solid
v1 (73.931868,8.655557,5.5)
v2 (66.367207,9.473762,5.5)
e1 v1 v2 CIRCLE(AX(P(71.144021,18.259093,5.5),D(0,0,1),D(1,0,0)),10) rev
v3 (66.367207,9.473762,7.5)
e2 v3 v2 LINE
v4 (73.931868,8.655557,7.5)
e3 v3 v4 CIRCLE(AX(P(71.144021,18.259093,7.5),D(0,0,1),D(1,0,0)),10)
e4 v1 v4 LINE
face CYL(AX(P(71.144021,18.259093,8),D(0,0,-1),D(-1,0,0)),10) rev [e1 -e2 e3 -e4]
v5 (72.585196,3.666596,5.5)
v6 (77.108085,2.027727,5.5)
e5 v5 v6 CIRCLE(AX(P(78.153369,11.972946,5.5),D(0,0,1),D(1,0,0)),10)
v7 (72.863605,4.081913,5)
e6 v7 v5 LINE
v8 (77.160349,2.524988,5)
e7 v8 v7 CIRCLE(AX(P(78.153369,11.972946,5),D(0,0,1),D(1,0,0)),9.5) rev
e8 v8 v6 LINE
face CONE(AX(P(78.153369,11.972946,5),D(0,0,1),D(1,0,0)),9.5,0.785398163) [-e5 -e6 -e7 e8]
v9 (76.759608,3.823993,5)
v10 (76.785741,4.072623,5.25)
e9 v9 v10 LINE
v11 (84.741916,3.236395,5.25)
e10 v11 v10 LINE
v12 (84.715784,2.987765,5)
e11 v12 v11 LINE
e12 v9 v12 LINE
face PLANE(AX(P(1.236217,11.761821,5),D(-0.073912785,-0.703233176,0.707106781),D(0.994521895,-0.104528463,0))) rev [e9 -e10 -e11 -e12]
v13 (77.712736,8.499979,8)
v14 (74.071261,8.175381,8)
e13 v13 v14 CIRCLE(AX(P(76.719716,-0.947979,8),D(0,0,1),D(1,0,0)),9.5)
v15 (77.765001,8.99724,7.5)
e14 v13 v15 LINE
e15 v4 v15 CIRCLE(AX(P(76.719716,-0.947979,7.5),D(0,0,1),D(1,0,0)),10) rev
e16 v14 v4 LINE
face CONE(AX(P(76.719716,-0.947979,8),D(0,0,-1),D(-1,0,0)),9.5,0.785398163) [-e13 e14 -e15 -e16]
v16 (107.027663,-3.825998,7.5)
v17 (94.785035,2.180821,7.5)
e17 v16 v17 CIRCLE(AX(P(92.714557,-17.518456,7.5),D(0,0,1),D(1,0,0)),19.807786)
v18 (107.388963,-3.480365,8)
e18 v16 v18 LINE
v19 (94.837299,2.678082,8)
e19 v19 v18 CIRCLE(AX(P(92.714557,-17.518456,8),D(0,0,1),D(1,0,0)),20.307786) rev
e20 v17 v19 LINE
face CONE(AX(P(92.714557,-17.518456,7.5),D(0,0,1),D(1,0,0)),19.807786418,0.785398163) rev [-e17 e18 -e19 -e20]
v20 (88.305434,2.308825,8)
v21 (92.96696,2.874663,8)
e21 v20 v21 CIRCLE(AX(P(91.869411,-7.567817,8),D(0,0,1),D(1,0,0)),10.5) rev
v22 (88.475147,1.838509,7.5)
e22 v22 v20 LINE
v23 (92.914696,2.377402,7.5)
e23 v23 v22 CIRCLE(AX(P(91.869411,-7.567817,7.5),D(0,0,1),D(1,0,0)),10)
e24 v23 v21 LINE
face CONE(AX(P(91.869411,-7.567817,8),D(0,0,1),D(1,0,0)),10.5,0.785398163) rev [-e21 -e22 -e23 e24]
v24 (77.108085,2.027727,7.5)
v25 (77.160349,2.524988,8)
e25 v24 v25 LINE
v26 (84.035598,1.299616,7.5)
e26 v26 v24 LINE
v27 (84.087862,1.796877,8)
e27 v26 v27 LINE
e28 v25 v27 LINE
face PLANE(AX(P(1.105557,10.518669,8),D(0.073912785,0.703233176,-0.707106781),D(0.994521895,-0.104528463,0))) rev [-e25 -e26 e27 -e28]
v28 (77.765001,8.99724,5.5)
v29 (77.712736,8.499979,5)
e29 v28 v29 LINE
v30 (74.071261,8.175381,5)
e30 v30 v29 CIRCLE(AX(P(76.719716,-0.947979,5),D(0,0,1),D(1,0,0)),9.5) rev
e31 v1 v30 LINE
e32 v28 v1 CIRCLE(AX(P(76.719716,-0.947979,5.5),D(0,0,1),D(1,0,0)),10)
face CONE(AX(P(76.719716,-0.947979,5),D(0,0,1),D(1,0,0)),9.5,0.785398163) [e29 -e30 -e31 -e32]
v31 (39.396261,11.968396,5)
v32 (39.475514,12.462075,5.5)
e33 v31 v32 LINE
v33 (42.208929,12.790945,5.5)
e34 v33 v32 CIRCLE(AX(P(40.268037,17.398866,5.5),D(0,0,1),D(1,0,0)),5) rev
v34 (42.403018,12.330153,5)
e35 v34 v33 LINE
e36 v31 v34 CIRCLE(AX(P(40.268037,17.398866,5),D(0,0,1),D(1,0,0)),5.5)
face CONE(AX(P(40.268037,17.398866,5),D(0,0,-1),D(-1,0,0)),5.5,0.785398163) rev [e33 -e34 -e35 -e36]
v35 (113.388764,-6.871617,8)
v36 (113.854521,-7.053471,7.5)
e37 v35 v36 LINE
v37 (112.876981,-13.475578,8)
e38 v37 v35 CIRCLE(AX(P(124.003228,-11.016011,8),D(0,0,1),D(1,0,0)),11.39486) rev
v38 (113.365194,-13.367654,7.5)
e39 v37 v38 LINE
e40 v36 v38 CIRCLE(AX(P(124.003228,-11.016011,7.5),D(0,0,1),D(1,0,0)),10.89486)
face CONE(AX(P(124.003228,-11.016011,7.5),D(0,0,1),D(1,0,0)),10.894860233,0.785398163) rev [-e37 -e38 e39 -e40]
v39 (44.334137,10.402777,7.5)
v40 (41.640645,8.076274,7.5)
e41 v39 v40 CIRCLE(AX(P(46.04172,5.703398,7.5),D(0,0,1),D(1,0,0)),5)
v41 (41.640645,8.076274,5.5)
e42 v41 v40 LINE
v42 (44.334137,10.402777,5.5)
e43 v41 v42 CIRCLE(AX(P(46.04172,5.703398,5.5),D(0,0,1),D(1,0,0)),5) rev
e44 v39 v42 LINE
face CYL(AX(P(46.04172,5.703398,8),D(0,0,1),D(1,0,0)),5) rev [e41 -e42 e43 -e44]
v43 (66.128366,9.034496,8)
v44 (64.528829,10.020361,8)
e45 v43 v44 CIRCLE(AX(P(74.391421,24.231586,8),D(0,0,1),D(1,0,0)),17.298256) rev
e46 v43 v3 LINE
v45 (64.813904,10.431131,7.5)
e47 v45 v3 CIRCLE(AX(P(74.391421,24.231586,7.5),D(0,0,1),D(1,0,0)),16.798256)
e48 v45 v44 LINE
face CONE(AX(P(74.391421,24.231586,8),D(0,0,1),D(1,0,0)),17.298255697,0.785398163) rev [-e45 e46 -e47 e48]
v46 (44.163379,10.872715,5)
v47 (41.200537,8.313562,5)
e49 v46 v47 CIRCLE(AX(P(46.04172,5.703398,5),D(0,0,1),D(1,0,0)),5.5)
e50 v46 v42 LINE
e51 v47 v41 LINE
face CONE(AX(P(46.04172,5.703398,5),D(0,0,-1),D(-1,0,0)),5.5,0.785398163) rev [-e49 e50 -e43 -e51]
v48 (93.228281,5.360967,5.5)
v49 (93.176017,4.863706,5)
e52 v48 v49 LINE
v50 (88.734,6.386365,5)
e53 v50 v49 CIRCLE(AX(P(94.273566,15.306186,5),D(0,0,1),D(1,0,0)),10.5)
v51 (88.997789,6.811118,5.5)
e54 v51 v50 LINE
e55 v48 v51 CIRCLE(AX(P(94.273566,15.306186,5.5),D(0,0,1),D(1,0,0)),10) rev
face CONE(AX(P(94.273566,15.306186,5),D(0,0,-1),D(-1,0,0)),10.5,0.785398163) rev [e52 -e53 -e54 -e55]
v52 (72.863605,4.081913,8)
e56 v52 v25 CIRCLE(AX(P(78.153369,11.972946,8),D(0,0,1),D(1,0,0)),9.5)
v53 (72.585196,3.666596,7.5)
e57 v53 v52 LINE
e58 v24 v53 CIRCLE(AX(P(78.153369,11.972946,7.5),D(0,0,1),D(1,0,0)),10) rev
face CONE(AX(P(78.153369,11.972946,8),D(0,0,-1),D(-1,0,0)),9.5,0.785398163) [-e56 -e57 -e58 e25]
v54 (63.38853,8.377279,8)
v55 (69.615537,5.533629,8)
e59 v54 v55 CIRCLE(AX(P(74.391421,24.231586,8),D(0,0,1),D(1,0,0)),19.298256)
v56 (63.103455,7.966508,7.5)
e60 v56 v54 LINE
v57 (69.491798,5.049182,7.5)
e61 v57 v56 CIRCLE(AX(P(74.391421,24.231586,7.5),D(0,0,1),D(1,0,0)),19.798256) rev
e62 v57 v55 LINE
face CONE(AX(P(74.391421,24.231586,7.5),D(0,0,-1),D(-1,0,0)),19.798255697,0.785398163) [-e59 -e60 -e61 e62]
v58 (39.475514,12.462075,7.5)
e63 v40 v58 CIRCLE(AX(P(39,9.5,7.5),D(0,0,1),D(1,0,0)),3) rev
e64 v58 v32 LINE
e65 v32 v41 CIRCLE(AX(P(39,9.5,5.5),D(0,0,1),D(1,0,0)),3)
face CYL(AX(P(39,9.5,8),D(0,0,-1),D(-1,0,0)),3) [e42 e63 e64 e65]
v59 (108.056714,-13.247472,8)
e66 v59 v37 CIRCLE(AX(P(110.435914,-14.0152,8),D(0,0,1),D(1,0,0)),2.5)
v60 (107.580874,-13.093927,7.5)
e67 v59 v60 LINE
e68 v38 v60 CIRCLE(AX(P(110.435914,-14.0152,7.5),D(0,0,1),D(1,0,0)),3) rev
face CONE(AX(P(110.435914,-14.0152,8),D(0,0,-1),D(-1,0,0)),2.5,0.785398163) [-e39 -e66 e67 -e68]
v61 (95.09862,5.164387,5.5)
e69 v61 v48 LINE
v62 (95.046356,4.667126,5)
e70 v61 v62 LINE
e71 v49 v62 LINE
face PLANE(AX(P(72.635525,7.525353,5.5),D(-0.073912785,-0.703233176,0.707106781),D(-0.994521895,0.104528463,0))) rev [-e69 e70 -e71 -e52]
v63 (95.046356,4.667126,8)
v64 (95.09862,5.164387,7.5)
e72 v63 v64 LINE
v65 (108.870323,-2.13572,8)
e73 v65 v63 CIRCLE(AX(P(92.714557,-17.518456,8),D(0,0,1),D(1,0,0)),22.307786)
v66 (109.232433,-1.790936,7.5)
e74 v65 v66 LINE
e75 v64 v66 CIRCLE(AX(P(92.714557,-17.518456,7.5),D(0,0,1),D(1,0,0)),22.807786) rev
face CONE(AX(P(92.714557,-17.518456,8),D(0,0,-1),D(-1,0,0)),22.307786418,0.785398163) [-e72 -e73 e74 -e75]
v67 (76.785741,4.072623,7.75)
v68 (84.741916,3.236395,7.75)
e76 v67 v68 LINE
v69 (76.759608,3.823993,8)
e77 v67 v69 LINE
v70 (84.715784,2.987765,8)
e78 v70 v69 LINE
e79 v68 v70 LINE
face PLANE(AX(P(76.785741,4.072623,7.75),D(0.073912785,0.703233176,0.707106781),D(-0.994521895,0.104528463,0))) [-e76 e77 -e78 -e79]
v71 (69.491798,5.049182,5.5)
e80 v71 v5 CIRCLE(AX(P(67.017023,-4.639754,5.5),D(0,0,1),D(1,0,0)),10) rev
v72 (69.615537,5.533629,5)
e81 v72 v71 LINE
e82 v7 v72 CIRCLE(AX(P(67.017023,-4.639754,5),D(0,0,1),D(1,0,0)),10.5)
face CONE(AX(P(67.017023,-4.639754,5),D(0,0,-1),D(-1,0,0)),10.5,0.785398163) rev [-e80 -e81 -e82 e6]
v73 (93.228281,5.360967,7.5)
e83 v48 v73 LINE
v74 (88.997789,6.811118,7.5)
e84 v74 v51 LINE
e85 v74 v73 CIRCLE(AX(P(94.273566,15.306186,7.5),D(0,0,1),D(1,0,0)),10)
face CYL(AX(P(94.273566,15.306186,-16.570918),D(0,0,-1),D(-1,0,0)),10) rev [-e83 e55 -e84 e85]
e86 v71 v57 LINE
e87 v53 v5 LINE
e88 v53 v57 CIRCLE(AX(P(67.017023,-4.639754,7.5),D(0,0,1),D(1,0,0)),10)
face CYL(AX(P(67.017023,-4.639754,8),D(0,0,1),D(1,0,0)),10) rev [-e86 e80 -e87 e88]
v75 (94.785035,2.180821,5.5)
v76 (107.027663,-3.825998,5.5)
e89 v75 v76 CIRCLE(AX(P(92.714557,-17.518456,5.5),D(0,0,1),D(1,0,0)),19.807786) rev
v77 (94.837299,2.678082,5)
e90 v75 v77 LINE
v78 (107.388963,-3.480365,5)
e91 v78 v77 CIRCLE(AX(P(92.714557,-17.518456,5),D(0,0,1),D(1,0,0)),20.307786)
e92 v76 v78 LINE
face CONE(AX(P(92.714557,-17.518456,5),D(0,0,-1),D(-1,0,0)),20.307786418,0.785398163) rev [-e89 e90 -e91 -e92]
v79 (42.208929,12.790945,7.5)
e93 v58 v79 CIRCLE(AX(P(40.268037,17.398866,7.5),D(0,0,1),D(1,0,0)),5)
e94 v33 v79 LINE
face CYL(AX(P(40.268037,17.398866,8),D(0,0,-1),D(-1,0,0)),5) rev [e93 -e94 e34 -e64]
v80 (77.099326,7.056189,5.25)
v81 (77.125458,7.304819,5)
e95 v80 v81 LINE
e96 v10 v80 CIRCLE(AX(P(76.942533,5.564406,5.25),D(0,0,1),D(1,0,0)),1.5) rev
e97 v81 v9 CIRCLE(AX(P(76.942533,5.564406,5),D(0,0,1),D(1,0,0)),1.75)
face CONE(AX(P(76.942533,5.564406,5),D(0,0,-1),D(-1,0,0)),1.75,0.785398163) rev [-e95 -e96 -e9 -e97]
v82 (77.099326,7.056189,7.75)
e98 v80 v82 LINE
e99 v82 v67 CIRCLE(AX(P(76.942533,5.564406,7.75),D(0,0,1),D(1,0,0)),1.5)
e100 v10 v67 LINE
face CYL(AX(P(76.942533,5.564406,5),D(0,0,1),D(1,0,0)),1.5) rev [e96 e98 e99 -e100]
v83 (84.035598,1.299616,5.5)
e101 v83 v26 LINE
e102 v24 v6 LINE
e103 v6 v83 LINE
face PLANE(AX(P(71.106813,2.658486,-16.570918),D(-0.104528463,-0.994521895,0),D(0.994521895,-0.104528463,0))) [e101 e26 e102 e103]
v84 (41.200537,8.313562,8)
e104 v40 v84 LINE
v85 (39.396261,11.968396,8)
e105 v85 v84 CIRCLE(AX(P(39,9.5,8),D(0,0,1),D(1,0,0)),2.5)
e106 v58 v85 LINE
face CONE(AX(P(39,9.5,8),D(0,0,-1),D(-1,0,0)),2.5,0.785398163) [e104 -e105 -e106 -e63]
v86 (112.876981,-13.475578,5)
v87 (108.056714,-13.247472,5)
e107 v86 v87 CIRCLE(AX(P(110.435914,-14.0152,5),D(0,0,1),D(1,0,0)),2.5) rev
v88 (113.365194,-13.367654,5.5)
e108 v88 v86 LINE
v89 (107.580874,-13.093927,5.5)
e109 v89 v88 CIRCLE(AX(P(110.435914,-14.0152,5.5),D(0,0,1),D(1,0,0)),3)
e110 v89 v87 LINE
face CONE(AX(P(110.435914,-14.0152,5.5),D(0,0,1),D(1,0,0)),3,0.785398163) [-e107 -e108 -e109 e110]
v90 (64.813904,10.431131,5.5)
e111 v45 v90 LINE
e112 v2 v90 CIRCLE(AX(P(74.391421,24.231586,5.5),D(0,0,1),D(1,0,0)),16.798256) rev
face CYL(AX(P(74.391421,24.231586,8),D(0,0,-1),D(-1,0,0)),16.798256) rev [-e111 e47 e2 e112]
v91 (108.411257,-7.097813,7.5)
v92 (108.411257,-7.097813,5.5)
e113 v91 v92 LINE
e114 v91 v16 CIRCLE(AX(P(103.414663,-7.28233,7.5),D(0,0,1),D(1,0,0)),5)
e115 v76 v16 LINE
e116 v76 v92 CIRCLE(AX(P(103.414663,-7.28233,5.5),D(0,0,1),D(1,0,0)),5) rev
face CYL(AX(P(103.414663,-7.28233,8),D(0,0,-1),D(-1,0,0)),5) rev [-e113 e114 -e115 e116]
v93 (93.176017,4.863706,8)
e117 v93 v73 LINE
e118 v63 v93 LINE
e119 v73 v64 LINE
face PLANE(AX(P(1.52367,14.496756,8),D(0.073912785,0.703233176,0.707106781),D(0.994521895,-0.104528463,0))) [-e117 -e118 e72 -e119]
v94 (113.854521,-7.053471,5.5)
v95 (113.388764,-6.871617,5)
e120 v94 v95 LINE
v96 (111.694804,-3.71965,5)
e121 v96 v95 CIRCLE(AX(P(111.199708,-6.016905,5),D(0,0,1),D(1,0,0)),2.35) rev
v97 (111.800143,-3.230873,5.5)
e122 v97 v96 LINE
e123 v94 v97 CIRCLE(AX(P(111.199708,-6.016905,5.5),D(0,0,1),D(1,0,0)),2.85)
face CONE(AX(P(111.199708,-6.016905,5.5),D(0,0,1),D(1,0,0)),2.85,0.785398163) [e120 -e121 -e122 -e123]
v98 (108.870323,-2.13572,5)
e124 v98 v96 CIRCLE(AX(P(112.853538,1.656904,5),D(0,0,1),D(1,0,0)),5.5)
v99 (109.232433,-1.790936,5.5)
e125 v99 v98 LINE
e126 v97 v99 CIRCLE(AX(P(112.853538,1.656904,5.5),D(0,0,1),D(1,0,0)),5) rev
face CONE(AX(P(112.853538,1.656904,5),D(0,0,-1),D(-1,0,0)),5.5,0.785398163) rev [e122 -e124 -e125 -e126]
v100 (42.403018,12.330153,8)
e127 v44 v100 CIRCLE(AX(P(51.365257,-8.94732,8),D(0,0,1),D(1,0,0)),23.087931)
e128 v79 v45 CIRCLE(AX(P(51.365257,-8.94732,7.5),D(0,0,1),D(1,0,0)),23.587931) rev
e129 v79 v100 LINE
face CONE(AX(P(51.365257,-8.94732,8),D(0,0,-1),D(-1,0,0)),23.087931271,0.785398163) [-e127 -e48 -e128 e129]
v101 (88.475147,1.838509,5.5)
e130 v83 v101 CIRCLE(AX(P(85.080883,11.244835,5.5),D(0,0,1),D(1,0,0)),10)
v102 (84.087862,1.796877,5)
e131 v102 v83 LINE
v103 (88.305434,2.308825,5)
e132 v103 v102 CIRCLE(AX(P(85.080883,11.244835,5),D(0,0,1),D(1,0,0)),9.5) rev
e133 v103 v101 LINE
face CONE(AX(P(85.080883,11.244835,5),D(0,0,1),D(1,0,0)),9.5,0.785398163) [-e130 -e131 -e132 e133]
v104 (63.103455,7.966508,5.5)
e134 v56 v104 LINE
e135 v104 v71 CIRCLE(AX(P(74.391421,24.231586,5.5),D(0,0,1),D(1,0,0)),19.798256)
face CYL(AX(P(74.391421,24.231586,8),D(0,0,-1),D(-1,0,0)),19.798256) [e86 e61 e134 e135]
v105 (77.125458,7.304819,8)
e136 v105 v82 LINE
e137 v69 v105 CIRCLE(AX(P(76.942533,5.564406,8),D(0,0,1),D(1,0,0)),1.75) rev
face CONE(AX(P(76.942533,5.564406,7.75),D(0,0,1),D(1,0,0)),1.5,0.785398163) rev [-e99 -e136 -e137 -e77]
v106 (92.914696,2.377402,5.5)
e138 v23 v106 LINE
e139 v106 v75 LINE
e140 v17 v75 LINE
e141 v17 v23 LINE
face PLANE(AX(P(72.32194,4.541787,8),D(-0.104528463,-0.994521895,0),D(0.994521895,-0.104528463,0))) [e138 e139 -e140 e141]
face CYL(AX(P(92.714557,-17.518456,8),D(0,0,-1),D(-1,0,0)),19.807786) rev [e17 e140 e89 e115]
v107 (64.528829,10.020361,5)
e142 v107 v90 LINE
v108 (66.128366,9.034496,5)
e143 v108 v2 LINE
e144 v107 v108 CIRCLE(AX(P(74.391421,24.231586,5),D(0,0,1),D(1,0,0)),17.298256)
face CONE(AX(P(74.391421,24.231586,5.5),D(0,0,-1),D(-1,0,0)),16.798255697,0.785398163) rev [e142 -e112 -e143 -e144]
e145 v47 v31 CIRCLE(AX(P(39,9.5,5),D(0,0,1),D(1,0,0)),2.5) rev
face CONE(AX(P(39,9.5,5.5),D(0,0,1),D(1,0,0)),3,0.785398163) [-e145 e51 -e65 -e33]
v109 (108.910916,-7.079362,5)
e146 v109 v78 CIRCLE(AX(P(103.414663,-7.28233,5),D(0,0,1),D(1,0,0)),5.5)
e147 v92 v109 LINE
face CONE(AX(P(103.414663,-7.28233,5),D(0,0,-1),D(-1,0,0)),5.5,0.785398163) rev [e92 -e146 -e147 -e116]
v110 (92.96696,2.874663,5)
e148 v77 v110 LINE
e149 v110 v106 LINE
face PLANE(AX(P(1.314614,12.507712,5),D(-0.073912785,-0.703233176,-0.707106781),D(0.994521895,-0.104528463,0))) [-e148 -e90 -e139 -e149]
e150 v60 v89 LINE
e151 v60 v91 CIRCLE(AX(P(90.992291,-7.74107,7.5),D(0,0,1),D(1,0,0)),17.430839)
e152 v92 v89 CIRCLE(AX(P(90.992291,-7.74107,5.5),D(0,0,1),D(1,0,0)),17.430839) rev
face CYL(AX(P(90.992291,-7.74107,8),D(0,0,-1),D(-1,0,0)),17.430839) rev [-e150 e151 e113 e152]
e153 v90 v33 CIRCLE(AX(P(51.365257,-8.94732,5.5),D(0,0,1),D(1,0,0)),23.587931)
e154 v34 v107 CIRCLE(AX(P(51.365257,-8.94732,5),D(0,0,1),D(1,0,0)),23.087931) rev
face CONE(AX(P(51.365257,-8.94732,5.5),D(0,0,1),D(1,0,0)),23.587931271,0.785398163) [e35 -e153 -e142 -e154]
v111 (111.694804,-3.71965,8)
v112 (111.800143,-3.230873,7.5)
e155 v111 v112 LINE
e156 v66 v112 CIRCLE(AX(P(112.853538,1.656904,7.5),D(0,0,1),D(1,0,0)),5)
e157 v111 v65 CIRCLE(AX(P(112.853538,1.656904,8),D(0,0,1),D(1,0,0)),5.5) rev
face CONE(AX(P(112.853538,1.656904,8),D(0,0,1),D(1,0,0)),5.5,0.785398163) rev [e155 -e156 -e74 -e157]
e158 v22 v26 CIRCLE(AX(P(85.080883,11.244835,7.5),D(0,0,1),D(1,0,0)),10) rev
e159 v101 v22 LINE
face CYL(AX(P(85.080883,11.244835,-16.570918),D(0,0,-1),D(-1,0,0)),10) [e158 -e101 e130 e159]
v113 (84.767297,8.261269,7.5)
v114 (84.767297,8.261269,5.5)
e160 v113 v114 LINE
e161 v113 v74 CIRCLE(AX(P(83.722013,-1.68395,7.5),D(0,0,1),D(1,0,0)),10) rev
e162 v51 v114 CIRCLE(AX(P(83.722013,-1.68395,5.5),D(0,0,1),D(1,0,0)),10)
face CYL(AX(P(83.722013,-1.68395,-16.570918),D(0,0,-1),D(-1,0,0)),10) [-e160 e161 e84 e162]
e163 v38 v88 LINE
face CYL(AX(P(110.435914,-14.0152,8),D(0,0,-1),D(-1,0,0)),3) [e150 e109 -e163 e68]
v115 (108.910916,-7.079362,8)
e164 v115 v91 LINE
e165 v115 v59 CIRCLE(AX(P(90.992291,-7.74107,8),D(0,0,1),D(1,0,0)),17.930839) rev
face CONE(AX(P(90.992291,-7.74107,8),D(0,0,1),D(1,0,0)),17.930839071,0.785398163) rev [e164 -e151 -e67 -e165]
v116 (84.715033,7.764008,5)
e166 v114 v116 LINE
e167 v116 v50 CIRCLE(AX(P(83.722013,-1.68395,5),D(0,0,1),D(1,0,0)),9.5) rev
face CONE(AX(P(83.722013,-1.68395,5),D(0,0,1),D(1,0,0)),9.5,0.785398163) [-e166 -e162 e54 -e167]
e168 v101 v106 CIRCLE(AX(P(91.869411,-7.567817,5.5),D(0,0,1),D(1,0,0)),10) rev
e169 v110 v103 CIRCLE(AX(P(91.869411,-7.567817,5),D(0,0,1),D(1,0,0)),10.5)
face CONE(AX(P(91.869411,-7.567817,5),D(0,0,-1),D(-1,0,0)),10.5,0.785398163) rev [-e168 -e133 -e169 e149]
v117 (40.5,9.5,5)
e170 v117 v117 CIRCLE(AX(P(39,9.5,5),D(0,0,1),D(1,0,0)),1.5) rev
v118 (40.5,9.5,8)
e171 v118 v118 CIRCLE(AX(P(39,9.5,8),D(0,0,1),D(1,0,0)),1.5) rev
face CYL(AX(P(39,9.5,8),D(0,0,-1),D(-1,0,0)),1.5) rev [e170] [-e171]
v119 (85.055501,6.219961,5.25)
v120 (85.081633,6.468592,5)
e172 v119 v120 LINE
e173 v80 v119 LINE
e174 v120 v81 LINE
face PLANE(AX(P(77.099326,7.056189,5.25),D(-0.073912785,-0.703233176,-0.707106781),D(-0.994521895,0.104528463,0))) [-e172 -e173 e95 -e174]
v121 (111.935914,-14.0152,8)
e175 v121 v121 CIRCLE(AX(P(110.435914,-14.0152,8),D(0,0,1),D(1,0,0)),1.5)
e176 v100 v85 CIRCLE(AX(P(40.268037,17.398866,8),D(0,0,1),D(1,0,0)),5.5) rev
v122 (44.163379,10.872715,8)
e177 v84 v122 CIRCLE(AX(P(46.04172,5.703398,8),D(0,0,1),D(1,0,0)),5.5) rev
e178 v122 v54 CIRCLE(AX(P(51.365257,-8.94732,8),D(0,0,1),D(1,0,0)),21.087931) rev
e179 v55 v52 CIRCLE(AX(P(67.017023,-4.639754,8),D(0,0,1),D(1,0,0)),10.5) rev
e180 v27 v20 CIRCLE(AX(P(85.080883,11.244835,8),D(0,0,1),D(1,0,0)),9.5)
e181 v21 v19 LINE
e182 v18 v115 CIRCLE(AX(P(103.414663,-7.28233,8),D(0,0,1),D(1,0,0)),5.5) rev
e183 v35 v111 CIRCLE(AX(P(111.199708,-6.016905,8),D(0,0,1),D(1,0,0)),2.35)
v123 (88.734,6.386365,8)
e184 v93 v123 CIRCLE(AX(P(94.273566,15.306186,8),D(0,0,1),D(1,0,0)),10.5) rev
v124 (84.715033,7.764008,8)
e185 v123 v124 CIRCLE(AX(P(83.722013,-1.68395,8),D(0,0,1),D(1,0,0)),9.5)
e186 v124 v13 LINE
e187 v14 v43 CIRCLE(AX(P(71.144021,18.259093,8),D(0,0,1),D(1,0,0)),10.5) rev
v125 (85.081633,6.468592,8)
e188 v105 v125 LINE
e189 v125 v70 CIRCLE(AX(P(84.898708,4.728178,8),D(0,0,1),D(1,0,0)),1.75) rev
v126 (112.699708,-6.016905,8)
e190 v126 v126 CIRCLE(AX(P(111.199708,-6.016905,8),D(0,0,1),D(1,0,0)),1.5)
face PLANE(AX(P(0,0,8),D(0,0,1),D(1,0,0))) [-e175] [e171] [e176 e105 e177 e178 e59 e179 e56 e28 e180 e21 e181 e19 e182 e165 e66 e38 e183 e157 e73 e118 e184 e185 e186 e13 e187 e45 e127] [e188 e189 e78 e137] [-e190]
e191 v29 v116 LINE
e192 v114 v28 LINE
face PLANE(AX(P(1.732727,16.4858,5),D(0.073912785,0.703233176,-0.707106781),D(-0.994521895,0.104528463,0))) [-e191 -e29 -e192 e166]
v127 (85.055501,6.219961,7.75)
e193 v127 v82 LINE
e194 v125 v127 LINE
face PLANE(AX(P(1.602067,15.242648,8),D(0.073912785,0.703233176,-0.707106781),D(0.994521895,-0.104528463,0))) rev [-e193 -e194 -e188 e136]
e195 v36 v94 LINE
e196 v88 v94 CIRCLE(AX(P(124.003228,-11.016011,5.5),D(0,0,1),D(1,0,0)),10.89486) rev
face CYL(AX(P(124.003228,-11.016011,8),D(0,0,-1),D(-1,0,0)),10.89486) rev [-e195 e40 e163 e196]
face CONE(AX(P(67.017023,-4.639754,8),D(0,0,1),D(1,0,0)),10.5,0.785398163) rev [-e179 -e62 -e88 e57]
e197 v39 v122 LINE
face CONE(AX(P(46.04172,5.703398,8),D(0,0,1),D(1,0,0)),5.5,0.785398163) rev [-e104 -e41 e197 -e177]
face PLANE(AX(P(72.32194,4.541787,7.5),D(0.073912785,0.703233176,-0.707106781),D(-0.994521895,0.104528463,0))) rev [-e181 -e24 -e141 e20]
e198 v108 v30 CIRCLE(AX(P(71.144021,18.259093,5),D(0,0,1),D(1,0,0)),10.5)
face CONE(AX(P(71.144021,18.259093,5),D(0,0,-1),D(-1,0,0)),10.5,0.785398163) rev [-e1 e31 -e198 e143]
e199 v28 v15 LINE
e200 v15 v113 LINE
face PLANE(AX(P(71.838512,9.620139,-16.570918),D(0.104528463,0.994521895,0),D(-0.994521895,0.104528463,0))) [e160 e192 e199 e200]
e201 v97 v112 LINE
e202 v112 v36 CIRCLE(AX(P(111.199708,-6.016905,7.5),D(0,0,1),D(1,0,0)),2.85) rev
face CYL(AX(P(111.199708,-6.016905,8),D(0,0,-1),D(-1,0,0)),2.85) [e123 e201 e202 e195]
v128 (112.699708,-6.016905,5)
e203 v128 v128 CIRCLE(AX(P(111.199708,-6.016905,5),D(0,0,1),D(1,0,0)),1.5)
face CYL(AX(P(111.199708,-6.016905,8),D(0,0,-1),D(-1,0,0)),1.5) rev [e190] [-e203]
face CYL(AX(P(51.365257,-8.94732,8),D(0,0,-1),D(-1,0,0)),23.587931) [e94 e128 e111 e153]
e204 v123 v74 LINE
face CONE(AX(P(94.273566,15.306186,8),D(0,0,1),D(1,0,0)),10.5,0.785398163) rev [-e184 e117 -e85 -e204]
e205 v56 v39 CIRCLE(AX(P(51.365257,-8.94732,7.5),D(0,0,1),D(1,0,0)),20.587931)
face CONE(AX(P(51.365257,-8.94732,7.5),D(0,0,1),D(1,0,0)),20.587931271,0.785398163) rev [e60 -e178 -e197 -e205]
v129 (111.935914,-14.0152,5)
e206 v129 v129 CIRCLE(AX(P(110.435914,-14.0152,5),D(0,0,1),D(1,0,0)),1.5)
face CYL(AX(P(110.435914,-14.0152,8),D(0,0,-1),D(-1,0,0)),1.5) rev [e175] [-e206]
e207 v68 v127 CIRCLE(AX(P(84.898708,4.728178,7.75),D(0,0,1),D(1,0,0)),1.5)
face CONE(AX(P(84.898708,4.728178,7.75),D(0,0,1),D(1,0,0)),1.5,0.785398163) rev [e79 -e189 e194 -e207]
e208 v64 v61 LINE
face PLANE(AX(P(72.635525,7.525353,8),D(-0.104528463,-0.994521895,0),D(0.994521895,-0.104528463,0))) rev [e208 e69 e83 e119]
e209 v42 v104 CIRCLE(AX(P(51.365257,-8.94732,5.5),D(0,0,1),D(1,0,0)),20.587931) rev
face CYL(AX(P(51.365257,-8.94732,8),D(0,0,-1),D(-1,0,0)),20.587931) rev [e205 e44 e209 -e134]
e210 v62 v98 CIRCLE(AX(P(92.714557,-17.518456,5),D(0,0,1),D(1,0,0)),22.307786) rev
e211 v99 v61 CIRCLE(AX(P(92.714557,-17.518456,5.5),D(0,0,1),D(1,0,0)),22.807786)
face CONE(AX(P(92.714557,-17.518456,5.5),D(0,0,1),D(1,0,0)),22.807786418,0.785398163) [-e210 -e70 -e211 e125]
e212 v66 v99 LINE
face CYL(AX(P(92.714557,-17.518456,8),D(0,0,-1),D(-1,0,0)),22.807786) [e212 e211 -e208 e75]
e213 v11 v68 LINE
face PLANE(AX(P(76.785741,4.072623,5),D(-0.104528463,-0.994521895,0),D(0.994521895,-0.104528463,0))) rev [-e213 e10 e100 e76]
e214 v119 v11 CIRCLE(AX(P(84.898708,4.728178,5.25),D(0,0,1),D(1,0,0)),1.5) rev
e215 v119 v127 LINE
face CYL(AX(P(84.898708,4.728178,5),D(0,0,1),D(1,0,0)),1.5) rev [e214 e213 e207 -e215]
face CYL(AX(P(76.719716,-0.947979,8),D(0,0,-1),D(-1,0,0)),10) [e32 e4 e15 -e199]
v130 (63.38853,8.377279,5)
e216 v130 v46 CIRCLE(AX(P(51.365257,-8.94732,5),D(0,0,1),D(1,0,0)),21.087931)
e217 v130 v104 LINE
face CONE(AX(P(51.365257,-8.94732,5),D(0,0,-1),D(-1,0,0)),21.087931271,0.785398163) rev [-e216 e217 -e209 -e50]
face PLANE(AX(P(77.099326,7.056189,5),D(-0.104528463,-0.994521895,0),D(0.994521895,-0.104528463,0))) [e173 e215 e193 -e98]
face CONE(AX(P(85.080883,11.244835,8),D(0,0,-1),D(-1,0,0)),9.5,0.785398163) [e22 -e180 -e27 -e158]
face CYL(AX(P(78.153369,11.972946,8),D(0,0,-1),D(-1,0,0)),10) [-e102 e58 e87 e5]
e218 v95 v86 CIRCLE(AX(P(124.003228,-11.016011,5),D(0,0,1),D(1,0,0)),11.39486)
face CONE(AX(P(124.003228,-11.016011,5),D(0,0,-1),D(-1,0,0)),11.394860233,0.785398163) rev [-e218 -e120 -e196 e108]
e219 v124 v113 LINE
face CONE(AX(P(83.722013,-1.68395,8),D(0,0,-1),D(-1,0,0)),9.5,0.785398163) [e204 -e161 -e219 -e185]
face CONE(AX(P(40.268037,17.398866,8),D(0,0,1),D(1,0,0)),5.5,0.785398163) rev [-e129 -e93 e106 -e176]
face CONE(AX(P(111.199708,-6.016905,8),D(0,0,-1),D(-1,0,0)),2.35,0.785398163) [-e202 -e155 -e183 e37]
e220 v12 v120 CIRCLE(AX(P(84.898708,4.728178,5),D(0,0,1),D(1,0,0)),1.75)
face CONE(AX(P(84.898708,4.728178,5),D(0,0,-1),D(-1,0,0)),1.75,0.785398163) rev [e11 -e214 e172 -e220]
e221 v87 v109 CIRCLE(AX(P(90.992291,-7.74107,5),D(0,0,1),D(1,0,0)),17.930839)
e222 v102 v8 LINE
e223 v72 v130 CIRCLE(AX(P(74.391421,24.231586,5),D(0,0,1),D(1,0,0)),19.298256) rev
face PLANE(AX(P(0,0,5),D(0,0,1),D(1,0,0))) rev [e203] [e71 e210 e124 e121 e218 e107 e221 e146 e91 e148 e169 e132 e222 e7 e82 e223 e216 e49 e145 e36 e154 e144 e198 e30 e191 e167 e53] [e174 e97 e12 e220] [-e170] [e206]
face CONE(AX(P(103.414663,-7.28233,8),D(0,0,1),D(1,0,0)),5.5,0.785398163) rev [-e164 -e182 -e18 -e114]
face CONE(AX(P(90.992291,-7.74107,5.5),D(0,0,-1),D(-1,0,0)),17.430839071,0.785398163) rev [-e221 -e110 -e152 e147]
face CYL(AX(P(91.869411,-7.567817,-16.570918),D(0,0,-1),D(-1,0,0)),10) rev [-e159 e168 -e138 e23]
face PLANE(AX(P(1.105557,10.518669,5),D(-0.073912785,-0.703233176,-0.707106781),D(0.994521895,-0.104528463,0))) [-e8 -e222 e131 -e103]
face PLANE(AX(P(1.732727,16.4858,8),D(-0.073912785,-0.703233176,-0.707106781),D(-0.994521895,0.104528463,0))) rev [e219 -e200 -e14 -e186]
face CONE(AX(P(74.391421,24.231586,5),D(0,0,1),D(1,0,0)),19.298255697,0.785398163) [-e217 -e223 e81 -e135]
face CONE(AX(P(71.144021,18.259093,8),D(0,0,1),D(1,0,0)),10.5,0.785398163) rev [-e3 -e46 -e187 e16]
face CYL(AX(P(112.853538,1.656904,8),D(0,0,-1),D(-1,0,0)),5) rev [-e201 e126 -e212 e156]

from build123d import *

# Parameters (mm, degrees)
SKETCH1_R             = 1.5
BOSS_EXTRUDE1_DEPTH   = 3
SKETCH1_R_2           = 3
BOSS_EXTRUDE1_2_DEPTH = 3
EXTRUDE_THIN1_DEPTH   = 3
BOSS_EXTRUDE2_DEPTH   = 3
FILLET1_R             = 10
FILLET2_R             = 10
FILLET3_R             = 5
CUT_EXTRUDE2_DEPTH    = 3
CHAMFER1_SIZE         = 0.25
FILLET4_SIZE          = 0.5


with BuildPart() as part:
    # Sketch1 → Boss-Extrude1 (new body)
    with BuildSketch(Plane.XY.offset(5)):
        with BuildLine():
            ThreePointArc((109.185458354, -4.000646729), (108.5228767, -5.038603319), (108.360025672, -6.259196566))
            ThreePointArc((108.360025672, -6.259196566), (108.310958913, -9.715379327), (107.5808738, -13.093926729))
            ThreePointArc((107.5808738, -13.093926729), (110.294106049, -17.011846795), (113.365194477, -13.367653777))
            ThreePointArc((113.365194477, -13.367653777), (113.140936636, -10.174222756), (113.854520762, -7.053471091))
            ThreePointArc((113.854520762, -7.053471091), (112.759359915, -3.631536319), (109.185458354, -4.000646729))
        make_face()
        with Locations((111.199707869, -6.016905367)):
            Circle(SKETCH1_R, mode=Mode.SUBTRACT)
        with Locations((110.435914095, -14.015200256)):
            Circle(SKETCH1_R, mode=Mode.SUBTRACT)
    extrude(amount=BOSS_EXTRUDE1_DEPTH)



with BuildPart() as body_2:
    # Sketch1 → Boss-Extrude1 2 (new body)
    with BuildSketch(Plane.XY.offset(5)):
        with Locations((39, 9.5)):
            Circle(SKETCH1_R_2)
        with Locations((39, 9.5)):
            Circle(SKETCH1_R, mode=Mode.SUBTRACT)
    extrude(amount=BOSS_EXTRUDE1_2_DEPTH)


with BuildPart() as part_1:
    add(part.part)

    add(body_2.part)  # Extrude-Thin1 merges body 2
    # Sketch3 → Extrude-Thin1 (add)
    with BuildSketch(Plane.XY.offset(5)):
        with BuildLine():
            ThreePointArc((41.593001143, 9.173549984), (52.518716901, 11.608273697), (63.103455441, 7.966508408))
            ThreePointArc((63.103455441, 7.966508408), (67.496674945, 5.672669193), (72.321939964, 4.541787477))
            Line((72.321939964, 4.541787477), (94.785034536, 2.180821101))
            ThreePointArc((94.785034536, 2.180821101), (102.503244611, -0.298409767), (108.581874595, -5.661954302))
            Line((108.581874595, -5.661954302), (110.985068552, -3.8662208))
            ThreePointArc((110.985068552, -3.8662208), (103.98579607, 2.309662542), (95.098619926, 5.164386787))
            Line((95.098619926, 5.164386787), (72.635525354, 7.525353163))
            ThreePointArc((72.635525354, 7.525353163), (68.541425508, 8.484874068), (64.813903968, 10.431131266))
            ThreePointArc((64.813903968, 10.431131266), (52.686795037, 14.60356162), (40.169022902, 11.814058641))
            Line((40.169022902, 11.814058641), (41.593001143, 9.173549984))
        make_face()
    extrude(amount=EXTRUDE_THIN1_DEPTH)

    # Sketch4 → Boss-Extrude2 (add)
    with BuildSketch(Plane.XY.offset(8)):
        Polygon((71.8385125, 9.620139149), (90.734428512, 7.634098347), (90.002729269, 0.672445079), (71.106813257, 2.658485881), align=None)
        with BuildLine():
            Line((77.099325998, 7.05618881), (85.055501161, 6.219961104))
            ThreePointArc((85.055501161, 6.219961104), (86.390491309, 4.571385566), (84.741915771, 3.236395418))
            Line((84.741915771, 3.236395418), (76.785740608, 4.072623124))
            ThreePointArc((76.785740608, 4.072623124), (75.45075046, 5.721198662), (77.099325998, 7.05618881))
        make_face(mode=Mode.SUBTRACT)
    extrude(amount=-BOSS_EXTRUDE2_DEPTH)

    # Fillet1
    # the kernel refuses this fillet: 10 mm, written as the material it takes off along each edge
    with BuildSketch(Plane(origin=(90.002729269, 0.672445079, 23), x_dir=(0.10452846326752661, 0.9945218953682867, 0), z_dir=(0, 0, -1))) as fillet1_piece_1:
        with BuildLine():
            CenterArc((10, -6), FILLET1_R, 143.130102354, 36.869897646)
            Line((0, -6), (-0.2, -6))
            Line((-0.2, -6), (-0.2, 0))
            Line((-0.2, 0), (0, 0.2))
            ThreePointArc((0, 0.2), (1, 0.2), (1.84, 0.12))
            Line((1.84, 0.12), (2, 0))
        make_face()
    extrude(amount=33, mode=Mode.SUBTRACT)
    with BuildSketch(Plane(origin=(90.734428512, 7.634098347, 23), x_dir=(-0.10452846326775972, -0.9945218953682622, 0), z_dir=(0, 0, -1))) as fillet1_piece_2:
        with BuildLine():
            CenterArc((10, 6), FILLET1_R, 180, 36.869897646)
            Line((0, 6), (-0.2, 6))
            Line((-0.2, 6), (-0.2, 0))
            Line((-0.2, 0), (0, -0.2))
            ThreePointArc((0, -0.2), (1, -0.2), (1.84, -0.12))
            Line((1.84, -0.12), (2, 0))
        make_face()
    extrude(amount=33, mode=Mode.SUBTRACT)
    with BuildSketch(Plane(origin=(71.106813257, 2.658485881, 23.085820281), x_dir=(0.9945218953682746, -0.10452846326764255, 0), z_dir=(0, 0, -1))) as fillet1_piece_3:
        with BuildLine():
            CenterArc((6.034328112, -10), FILLET1_R, 90, 37.116152296)
            Line((0, -2.025861537), (-0.120686562, -1.866378767))
            ThreePointArc((-0.120686562, -1.866378767), (-0.2, -1.012930768), (-0.2, 0))
            Line((-0.2, 0), (0, 0.2))
            Line((0, 0.2), (6.034328112, 0.2))
            Line((6.034328112, 0.2), (6.034328112, 0))
        make_face()
    extrude(amount=33.171640562, mode=Mode.SUBTRACT)
    with BuildSketch(Plane(origin=(71.8385125, 9.620139149, 22.897832051), x_dir=(-0.10452846326748966, -0.9945218953682906, 0), z_dir=(0, 0, -1))) as fillet1_piece_4:
        with BuildLine():
            CenterArc((10, -5.95913282), FILLET1_R, 143.422234679, 36.577765321)
            Line((0, -5.95913282), (-0.2, -5.95913282))
            Line((-0.2, -5.95913282), (-0.2, 0))
            Line((-0.2, 0), (0, 0.2))
            ThreePointArc((0, 0.2), (0.984756046, 0.2), (1.808902334, 0.119182656))
            Line((1.808902334, 0.119182656), (1.969512093, 0))
        make_face()
    extrude(amount=32.795664101, mode=Mode.SUBTRACT)

    # Fillet2
    fillet2_edges = [part_1.edges().sort_by_distance(p)[0] for p in [
        (71.632642427, 7.66141625, 6.5),
        (90.525371585, 5.645054556, 6.5),
        (90.211786196, 2.66148887, 6.5),
        (71.31857345, 4.673249537, 6.5),
    ]]
    fillet(fillet2_edges, radius=FILLET2_R)

    # Fillet3
    fillet3_edges = [part_1.edges().sort_by_distance(p)[0] for p in [
        (108.409742984, -5.435015389, 6.5),
        (110.509408047, -3.251767729, 6.5),
        (41.997837089, 9.386101864, 6.5),
        (40.597330828, 12.039396429, 6.5),
    ]]
    fillet(fillet3_edges, radius=FILLET3_R)

    # Sketch4<2> → Cut-Extrude2 (cut)
    with BuildSketch(Plane.XY.offset(8)):
        with BuildLine():
            Line((77.099325998, 7.05618881), (85.055501161, 6.219961104))
            ThreePointArc((85.055501161, 6.219961104), (86.390491309, 4.571385566), (84.741915771, 3.236395418))
            Line((84.741915771, 3.236395418), (76.785740608, 4.072623124))
            ThreePointArc((76.785740608, 4.072623124), (75.45075046, 5.721198662), (77.099325998, 7.05618881))
        make_face()
    extrude(amount=-CUT_EXTRUDE2_DEPTH, mode=Mode.SUBTRACT)

    # Chamfer1
    chamfer1_edges = [part_1.edges().sort_by_distance(p)[0] for p in [
        (81.077413579, 6.638074957, 8),
        (86.390491309, 4.571385566, 5),
        (80.76382819, 3.654509271, 5),
        (75.45075046, 5.721198662, 5),
        (81.077413579, 6.638074957, 5),
        (75.45075046, 5.721198662, 8),
        (80.76382819, 3.654509271, 8),
        (86.390491309, 4.571385566, 8),
    ]]
    chamfer(chamfer1_edges, length=CHAMFER1_SIZE)

    # Fillet4
    fillet4_edges = [part_1.edges().sort_by_distance(p)[0] for p in [
        (80.571841293, 1.663671348, 5),
        (80.571841293, 1.663671348, 8),
        (81.266148853, 8.62925464, 8),
        (75.831843077, 9.0125273, 8),
        (86.285883658, 1.317701678, 8),
        (81.266148853, 8.62925464, 5),
        (74.746621894, 2.571133627, 5),
        (86.964648505, 7.775717809, 5),
        (74.746621894, 2.571133627, 8),
        (66.167237141, 6.222318503, 8),
        (66.167237141, 6.222318503, 5),
        (65.577546873, 9.931341027, 8),
        (65.577546873, 9.931341027, 5),
        (75.831843077, 9.0125273, 5),
        (86.285883658, 1.317701678, 5),
        (53.814375327, 14.513121306, 5),
        (86.964648505, 7.775717809, 8),
        (71.097481671, 4.489860289, 5),
        (54.015350868, 11.469337492, 8),
        (71.097481671, 4.489860289, 8),
        (70.068678069, 8.317079629, 5),
        (70.068678069, 8.317079629, 8),
        (90.66440994, 2.359315815, 8),
        (90.66440994, 2.359315815, 5),
        (91.030929726, 5.846518637, 8),
        (91.030929726, 5.846518637, 5),
        (93.849865119, 2.279111367, 8),
        (101.439573781, 0.26418945, 5),
        (101.439573781, 0.26418945, 8),
        (108.258346947, -10.132192641, 5),
        (108.258346947, -10.132192641, 8),
        (102.785056404, 2.945662756, 5),
        (102.785056404, 2.945662756, 8),
        (36.30994009, 8.172002379, 5),
        (36.30994009, 8.172002379, 8),
        (94.163450509, 5.262677053, 5),
        (108.019819848, -5.334888598, 8),
        (108.019819848, -5.334888598, 5),
        (110.407911183, -2.704163701, 8),
        (110.407911183, -2.704163701, 5),
        (42.773374787, 9.487301339, 8),
        (42.773374787, 9.487301339, 5),
        (40.865302991, 12.434666794, 8),
        (94.163450509, 5.262677053, 8),
        (40.865302991, 12.434666794, 5),
        (53.814375327, 14.513121306, 8),
        (54.015350868, 11.469337492, 5),
        (93.849865119, 2.279111367, 5),
        (113.710131038, -4.667729504, 5),
        (110.294106049, -17.011846795, 8),
        (113.710131038, -4.667729504, 8),
        (113.140936636, -10.174222756, 5),
        (110.294106049, -17.011846795, 5),
        (113.140936636, -10.174222756, 8),
    ]]
    chamfer(fillet4_edges, length=FILLET4_SIZE)


solid = part_1.part
